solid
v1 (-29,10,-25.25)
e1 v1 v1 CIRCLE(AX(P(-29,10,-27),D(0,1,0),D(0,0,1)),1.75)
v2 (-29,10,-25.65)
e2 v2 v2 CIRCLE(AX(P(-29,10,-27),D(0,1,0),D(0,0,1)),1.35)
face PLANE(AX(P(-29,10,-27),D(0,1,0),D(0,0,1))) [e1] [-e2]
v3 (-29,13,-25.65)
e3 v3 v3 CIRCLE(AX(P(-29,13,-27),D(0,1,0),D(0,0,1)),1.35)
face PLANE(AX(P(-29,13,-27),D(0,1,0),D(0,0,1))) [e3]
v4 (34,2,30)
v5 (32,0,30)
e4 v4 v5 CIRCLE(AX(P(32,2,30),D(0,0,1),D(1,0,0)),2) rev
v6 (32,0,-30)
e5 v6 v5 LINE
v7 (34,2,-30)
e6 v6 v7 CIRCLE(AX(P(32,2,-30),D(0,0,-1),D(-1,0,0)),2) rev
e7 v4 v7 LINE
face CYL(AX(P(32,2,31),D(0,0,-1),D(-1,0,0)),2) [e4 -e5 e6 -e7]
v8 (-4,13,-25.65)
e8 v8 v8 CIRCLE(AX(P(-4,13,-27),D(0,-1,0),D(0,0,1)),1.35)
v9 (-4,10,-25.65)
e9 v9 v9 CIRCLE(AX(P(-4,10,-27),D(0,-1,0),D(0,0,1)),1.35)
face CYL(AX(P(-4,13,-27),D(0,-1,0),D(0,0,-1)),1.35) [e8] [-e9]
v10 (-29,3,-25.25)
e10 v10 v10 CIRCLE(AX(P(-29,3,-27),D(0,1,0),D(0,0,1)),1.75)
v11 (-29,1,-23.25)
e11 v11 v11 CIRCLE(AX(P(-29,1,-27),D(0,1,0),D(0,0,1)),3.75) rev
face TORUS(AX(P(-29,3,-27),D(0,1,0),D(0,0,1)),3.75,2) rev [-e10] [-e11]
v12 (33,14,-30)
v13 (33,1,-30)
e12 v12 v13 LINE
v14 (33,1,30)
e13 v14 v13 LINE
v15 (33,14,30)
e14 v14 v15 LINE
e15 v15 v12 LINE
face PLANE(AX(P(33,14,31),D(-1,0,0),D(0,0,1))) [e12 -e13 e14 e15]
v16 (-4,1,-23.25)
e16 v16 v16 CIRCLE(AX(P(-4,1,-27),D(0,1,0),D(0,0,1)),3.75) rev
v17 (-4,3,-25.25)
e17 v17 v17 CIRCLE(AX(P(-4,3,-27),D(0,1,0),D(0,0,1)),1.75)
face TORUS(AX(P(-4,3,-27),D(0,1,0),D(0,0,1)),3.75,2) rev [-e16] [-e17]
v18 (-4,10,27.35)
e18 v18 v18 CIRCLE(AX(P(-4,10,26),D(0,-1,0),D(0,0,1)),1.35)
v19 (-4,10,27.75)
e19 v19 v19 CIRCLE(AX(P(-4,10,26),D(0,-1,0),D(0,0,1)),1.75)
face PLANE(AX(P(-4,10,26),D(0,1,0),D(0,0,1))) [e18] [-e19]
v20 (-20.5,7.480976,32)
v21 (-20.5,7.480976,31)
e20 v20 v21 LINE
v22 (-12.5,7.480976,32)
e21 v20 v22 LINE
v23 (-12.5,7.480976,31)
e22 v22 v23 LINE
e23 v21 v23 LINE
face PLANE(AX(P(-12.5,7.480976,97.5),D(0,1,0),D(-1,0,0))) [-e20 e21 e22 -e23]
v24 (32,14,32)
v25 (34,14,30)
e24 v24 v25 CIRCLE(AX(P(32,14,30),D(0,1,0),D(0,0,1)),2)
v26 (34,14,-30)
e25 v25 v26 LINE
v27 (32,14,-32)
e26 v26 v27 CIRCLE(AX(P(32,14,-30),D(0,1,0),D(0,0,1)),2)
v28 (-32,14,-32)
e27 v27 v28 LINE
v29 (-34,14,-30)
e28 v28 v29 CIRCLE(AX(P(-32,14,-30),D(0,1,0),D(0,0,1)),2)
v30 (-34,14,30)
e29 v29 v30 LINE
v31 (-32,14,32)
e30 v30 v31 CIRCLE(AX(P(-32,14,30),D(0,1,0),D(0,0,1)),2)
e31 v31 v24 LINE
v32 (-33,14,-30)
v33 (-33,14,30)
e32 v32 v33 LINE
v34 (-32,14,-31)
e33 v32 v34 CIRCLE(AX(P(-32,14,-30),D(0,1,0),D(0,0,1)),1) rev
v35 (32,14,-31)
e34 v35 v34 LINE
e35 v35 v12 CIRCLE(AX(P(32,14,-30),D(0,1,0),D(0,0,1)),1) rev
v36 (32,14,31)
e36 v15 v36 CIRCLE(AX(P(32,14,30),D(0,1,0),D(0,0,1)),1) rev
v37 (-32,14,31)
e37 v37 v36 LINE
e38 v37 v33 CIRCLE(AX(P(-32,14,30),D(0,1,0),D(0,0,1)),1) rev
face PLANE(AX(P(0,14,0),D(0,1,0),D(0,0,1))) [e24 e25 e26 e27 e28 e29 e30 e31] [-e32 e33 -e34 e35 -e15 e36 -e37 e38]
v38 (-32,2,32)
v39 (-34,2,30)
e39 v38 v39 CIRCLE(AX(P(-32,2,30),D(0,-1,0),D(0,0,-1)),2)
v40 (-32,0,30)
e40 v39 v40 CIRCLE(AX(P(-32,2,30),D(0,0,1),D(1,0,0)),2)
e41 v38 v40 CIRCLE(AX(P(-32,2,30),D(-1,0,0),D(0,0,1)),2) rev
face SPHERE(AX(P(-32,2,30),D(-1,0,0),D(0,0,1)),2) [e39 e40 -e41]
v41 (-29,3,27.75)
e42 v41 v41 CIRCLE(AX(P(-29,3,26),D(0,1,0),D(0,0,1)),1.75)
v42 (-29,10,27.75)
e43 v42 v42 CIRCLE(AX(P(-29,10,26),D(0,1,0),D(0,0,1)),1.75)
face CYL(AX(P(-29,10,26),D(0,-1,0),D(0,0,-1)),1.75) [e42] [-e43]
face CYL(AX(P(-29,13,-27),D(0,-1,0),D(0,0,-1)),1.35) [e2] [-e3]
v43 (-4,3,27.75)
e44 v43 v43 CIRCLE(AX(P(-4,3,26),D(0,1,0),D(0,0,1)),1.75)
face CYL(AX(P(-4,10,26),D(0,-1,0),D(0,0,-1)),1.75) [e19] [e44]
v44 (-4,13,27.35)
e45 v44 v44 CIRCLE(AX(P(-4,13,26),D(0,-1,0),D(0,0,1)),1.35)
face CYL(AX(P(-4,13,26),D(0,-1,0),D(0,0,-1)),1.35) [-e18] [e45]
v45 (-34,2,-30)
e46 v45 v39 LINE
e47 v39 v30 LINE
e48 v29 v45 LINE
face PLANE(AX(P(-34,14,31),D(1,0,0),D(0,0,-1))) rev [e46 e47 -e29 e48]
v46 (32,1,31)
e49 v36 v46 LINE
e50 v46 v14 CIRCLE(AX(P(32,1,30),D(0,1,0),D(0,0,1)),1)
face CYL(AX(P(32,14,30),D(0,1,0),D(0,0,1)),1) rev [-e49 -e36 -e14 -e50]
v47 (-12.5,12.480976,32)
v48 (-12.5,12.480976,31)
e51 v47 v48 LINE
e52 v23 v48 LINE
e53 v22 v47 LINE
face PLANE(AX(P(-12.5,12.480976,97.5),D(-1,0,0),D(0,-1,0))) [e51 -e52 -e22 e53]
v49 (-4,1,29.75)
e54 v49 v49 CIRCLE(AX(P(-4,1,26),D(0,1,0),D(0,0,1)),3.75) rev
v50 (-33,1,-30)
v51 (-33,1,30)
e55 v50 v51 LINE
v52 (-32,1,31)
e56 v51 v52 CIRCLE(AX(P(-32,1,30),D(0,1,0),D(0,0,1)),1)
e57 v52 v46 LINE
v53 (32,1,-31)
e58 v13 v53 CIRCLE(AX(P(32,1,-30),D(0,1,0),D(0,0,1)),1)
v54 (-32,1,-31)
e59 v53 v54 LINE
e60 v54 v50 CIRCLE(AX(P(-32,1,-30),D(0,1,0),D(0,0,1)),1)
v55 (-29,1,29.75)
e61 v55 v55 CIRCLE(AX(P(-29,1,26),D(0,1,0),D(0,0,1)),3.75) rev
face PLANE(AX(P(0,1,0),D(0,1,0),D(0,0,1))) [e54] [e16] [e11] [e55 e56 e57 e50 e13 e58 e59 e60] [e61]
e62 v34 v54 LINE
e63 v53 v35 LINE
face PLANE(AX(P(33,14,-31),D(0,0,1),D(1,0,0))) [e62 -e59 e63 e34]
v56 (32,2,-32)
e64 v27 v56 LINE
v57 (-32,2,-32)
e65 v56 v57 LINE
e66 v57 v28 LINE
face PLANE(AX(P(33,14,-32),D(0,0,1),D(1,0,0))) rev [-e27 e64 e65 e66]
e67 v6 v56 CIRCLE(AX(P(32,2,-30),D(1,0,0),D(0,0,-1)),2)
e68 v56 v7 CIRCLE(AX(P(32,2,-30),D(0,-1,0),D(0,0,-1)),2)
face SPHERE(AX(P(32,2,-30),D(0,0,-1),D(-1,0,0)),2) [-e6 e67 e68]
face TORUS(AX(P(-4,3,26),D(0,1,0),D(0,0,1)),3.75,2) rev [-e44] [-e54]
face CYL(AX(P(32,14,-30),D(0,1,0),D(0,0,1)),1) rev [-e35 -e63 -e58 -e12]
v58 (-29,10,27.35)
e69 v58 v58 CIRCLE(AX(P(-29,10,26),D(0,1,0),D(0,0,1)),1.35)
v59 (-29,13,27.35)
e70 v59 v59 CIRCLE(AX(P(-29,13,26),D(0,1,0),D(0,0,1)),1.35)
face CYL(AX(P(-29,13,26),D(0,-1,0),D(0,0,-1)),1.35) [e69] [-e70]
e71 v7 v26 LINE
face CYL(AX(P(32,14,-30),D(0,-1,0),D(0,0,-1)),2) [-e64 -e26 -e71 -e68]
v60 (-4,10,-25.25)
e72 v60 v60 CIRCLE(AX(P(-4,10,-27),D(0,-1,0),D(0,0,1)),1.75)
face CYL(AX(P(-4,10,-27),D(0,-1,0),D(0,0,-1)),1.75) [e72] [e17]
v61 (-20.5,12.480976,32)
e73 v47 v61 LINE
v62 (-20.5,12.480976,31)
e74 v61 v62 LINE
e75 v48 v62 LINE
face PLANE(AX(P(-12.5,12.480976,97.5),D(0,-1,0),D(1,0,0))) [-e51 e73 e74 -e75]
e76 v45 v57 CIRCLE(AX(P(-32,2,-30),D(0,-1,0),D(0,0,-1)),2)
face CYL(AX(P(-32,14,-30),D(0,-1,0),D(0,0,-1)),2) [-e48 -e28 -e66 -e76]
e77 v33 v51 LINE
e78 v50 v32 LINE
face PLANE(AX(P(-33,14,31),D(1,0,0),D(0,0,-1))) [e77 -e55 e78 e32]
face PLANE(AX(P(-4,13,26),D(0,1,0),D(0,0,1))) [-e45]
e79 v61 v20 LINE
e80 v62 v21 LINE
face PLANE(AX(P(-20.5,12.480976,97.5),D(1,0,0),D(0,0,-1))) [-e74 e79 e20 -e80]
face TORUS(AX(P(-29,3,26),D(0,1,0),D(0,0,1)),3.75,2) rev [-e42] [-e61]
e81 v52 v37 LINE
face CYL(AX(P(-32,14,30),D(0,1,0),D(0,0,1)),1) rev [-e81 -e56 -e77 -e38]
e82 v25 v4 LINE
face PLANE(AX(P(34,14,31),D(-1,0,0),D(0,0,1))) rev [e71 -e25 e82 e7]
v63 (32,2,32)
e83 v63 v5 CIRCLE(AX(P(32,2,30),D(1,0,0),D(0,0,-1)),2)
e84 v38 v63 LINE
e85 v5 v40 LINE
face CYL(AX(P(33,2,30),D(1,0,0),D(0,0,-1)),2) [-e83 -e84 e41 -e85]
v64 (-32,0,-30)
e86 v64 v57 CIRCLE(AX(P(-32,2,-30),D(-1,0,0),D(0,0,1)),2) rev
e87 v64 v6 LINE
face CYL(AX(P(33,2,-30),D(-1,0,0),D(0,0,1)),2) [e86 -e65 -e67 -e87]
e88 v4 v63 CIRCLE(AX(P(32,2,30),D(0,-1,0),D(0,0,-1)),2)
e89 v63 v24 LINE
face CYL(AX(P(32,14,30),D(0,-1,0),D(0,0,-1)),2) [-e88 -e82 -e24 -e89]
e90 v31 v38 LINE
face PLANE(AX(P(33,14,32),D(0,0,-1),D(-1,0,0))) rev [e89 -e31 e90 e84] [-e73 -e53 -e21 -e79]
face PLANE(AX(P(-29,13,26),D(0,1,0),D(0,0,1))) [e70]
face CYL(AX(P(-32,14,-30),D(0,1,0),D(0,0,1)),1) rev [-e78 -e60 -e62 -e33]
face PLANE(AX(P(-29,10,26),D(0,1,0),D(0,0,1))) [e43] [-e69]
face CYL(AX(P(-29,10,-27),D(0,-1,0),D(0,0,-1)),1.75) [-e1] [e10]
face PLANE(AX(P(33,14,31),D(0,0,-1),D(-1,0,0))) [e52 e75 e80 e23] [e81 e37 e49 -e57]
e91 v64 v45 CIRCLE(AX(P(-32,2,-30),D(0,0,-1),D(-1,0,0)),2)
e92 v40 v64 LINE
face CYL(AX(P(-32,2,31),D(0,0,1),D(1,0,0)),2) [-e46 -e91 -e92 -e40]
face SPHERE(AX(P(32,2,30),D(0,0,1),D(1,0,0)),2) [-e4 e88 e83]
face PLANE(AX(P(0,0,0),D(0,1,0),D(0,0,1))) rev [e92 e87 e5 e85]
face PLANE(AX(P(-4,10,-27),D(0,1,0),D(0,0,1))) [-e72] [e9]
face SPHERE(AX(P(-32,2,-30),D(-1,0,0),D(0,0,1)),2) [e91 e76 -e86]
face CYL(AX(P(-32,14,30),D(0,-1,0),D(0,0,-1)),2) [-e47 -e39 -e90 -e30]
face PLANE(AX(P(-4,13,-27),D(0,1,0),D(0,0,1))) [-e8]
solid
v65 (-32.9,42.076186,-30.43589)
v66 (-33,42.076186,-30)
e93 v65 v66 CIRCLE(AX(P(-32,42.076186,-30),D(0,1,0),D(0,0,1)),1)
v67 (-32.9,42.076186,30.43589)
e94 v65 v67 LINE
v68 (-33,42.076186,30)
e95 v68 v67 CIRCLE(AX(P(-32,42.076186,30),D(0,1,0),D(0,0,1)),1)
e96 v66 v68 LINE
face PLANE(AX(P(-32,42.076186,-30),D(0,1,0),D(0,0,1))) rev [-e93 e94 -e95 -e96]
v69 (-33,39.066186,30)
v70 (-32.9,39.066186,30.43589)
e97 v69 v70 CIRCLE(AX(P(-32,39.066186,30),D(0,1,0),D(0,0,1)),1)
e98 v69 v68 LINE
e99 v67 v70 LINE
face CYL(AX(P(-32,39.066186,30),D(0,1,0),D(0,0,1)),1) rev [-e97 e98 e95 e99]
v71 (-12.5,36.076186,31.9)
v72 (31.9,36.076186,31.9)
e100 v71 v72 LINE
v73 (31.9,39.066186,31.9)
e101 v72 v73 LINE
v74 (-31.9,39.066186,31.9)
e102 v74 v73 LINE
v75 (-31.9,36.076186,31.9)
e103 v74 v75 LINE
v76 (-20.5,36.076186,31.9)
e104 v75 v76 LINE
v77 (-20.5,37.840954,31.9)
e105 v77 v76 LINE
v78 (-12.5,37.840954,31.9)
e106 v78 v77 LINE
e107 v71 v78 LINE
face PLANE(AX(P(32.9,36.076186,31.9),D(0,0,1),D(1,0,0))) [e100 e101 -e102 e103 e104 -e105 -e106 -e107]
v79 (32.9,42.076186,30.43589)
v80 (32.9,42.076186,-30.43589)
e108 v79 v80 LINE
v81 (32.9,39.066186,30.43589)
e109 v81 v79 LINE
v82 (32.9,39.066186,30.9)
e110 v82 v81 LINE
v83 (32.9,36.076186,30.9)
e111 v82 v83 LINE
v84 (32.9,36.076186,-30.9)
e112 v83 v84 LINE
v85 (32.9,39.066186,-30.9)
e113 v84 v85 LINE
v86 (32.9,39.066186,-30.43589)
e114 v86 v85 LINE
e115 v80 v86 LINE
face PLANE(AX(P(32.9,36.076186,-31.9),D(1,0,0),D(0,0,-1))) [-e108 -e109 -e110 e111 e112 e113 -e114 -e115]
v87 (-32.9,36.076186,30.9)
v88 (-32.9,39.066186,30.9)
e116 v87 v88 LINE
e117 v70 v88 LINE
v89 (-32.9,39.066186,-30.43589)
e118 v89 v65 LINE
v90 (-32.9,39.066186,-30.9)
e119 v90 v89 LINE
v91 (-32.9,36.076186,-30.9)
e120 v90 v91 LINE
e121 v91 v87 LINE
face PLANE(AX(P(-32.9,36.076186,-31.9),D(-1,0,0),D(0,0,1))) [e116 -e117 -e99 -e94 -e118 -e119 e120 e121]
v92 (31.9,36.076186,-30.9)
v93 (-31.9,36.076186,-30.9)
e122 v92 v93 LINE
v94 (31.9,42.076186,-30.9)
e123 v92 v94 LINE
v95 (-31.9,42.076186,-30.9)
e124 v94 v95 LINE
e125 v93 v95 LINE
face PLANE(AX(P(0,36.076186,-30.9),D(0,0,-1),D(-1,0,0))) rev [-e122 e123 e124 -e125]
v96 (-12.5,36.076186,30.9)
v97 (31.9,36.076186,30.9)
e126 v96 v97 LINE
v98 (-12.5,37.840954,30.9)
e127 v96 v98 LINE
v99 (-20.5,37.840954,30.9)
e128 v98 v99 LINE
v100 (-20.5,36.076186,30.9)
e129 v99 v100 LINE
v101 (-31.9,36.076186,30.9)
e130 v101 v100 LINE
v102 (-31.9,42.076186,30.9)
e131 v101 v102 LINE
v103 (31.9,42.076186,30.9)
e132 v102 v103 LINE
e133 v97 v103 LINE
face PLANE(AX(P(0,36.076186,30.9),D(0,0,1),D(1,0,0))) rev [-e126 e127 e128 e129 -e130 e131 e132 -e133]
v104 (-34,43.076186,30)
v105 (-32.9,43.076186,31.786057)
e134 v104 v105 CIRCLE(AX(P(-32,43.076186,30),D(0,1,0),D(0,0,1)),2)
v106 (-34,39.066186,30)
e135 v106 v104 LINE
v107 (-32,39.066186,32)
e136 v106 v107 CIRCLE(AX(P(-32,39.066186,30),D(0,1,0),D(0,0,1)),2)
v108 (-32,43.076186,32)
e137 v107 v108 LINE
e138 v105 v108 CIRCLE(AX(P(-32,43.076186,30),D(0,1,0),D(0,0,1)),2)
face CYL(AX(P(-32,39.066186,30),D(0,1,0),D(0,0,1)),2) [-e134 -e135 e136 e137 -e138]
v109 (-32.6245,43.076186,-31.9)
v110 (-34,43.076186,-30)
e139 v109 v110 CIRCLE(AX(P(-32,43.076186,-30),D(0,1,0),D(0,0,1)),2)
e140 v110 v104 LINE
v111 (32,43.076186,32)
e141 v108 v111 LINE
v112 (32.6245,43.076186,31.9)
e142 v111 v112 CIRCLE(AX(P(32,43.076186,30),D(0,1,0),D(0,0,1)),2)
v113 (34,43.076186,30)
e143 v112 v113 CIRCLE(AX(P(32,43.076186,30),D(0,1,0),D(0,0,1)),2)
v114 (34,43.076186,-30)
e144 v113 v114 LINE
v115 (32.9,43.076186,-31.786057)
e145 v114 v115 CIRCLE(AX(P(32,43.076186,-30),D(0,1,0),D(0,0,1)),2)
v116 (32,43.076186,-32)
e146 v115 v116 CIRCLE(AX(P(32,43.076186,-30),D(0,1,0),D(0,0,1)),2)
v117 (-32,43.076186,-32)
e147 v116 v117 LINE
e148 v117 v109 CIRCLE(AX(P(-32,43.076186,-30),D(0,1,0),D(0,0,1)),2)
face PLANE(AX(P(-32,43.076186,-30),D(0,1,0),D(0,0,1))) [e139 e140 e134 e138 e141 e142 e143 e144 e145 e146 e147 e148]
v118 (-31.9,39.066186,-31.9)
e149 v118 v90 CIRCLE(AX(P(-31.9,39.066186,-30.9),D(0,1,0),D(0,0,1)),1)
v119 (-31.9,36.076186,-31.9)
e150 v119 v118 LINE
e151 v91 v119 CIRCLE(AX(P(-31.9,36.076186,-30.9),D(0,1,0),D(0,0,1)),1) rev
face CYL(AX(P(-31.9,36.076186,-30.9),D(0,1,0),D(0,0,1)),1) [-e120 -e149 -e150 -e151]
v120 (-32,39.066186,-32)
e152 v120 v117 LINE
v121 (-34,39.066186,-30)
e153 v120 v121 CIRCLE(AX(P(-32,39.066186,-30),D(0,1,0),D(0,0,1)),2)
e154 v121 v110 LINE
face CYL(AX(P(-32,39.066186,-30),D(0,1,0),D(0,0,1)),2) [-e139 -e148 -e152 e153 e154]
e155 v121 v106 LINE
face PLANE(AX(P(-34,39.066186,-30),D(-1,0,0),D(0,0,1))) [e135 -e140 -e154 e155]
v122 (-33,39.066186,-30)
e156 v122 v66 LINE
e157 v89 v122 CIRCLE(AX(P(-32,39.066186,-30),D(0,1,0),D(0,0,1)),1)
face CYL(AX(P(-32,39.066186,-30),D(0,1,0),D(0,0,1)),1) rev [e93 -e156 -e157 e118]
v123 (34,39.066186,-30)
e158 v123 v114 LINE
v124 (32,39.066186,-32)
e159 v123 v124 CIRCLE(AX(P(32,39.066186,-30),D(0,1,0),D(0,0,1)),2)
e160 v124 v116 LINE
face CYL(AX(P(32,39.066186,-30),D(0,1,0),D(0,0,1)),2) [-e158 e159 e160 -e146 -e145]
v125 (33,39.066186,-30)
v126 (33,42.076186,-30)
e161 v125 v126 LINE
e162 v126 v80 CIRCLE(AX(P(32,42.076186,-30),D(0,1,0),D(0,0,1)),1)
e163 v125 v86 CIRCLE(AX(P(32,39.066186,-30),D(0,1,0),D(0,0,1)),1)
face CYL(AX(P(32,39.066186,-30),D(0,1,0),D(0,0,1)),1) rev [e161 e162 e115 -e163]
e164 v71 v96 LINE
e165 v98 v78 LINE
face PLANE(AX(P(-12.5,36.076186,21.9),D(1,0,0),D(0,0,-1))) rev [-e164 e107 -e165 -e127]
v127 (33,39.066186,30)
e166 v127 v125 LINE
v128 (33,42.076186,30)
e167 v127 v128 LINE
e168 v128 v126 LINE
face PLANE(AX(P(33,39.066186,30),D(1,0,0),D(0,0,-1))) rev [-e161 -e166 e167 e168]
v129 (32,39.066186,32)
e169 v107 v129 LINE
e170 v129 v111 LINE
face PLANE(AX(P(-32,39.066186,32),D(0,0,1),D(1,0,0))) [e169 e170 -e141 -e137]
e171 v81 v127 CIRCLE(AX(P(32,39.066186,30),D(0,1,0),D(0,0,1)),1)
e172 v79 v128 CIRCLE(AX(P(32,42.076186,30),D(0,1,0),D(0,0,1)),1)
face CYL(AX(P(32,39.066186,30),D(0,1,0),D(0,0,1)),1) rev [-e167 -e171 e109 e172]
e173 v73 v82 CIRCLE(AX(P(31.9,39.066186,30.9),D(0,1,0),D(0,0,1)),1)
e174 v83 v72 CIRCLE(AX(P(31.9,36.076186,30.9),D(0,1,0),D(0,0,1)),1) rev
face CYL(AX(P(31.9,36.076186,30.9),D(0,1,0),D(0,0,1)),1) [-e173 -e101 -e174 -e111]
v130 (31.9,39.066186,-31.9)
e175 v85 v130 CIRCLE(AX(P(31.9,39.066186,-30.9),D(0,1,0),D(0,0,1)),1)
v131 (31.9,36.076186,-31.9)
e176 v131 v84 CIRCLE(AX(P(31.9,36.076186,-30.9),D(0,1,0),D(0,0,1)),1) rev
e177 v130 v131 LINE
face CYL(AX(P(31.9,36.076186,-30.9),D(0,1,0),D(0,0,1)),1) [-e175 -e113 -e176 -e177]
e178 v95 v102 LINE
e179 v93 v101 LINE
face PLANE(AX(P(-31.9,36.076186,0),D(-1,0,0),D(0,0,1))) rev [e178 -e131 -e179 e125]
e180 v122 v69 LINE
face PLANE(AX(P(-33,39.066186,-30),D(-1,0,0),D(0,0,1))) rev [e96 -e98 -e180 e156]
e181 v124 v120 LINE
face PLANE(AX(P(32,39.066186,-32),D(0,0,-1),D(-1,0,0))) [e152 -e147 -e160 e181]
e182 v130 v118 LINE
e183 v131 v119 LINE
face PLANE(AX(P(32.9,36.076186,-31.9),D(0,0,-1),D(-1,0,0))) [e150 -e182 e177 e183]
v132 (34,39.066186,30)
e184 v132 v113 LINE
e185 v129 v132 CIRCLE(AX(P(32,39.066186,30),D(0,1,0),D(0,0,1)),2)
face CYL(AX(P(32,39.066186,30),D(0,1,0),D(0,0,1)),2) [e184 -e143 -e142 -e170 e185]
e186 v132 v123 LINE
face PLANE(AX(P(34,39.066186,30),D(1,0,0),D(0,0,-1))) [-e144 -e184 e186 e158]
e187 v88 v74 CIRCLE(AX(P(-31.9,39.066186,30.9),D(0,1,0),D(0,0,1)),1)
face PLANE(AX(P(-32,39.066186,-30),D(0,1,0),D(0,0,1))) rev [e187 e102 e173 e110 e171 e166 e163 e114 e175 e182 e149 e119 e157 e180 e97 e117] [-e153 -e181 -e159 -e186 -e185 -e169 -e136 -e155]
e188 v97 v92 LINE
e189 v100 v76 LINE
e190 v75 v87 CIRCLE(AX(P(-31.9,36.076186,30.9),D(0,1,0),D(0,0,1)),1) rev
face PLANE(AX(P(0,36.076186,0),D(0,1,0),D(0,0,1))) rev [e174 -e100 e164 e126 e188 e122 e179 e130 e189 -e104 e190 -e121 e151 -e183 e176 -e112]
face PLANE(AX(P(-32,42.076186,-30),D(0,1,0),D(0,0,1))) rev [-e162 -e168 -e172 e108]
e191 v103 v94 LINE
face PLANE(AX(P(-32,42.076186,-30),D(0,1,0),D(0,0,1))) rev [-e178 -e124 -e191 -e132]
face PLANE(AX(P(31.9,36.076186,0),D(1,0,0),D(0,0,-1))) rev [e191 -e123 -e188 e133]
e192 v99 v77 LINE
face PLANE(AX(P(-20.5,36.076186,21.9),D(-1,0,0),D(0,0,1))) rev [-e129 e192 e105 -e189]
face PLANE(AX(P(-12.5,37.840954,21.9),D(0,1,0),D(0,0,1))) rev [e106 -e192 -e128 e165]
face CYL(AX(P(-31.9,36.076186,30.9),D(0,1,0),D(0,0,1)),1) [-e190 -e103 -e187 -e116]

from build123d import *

# Parameters (mm, degrees)
SKETCH1_W                = 68
SKETCH1_H                = 64
SKETCH1_W_2              = 66
SKETCH1_H_2              = 62
EXTRUDE_THIN1_DEPTH      = 14
SKETCH1_2_W              = 66
SKETCH1_2_H              = 62
BOSS_EXTRUDE1_DEPTH      = 1
SKETCH3_R                = 1.75
BOSS_EXTRUDE2_DEPTH      = 9
SKETCH5_R                = 1.75
BOSS_EXTRUDE3_DEPTH      = 9
SKETCH7_R                = 1.35
BOSS_EXTRUDE4_DEPTH      = 3
SKETCH8_R                = 1.35
BOSS_EXTRUDE5_DEPTH      = 3
FILLET2_R                = 2
FILLET3_R                = 2
FILLET4_R                = 2
FILLET3_OF_MIRROR1_R     = 2
FILLET4_OF_MIRROR1_R     = 2
CUT_EXTRUDE1_START       = 2
SKETCH14_W               = 8
SKETCH14_H               = 5
CUT_EXTRUDE1_DEPTH       = 126.5
FILLET7_R                = 1
BOSS_EXTRUDE9_DEPTH      = 4
BOSS_EXTRUDE9_DEPTH_BACK = 0.01
BOSS_EXTRUDE9_START      = 20
SHELL1_T                 = -1
SKETCH25_W               = 65.8
SKETCH25_H               = 63.8
SKETCH25_W_2             = 63.8
SKETCH25_H_2             = 61.8
EXTRUDE_THIN5_DEPTH      = 7
FILLET8_R                = 1
SKETCH26_W               = 8
SKETCH26_H               = 1.764767718
CUT_EXTRUDE2_DEPTH       = 10


with BuildPart() as part:
    # Sketch1 → Extrude-Thin1 (new body)
    with BuildSketch(Plane(origin=(0, 0, 0), x_dir=(1, 0, 0), z_dir=(0, 1, 0))):
        Rectangle(SKETCH1_W, SKETCH1_H)
        Rectangle(SKETCH1_W_2, SKETCH1_H_2, mode=Mode.SUBTRACT)
    extrude(amount=EXTRUDE_THIN1_DEPTH)

    # Sketch1<2> → Boss-Extrude1 (add)
    with BuildSketch(Plane(origin=(0, 0, 0), x_dir=(1, 0, 0), z_dir=(0, 1, 0))):
        Rectangle(SKETCH1_2_W, SKETCH1_2_H)
    extrude(amount=BOSS_EXTRUDE1_DEPTH)

    # Sketch3 → Boss-Extrude2 (add)
    with BuildSketch(Plane(origin=(0, 1, 0), x_dir=(1, 0, 0), z_dir=(0, 1, 0))):
        with Locations(Location((-29, 27, 0), (0, 0, 270))):
            Circle(SKETCH3_R)
    boss_extrude2 = extrude(amount=BOSS_EXTRUDE2_DEPTH)

    # Sketch5 → Boss-Extrude3 (add)
    with BuildSketch(Plane(origin=(0, 1, 0), x_dir=(1, 0, 0), z_dir=(0, 1, 0))):
        with Locations(Location((-29, -26, 0), (0, 0, 270))):
            Circle(SKETCH5_R)
    boss_extrude3 = extrude(amount=BOSS_EXTRUDE3_DEPTH)

    # Sketch7 → Boss-Extrude4 (add)
    with BuildSketch(Plane(origin=(0, 10, 0), x_dir=(1, 0, 0), z_dir=(0, 1, 0))):
        with Locations(Location((-29, 27, 0), (0, 0, 270))):
            Circle(SKETCH7_R)
    boss_extrude4 = extrude(amount=BOSS_EXTRUDE4_DEPTH)

    # Sketch8 → Boss-Extrude5 (add)
    with BuildSketch(Plane(origin=(0, 10, 0), x_dir=(1, 0, 0), z_dir=(0, 1, 0))):
        with Locations(Location((-29, -26, 0), (0, 0, 270))):
            Circle(SKETCH8_R)
    boss_extrude5 = extrude(amount=BOSS_EXTRUDE5_DEPTH)

    # Fillet2
    fillet2_edges = [part.edges().sort_by_distance(p)[0] for p in [
        (0, 0, -32),
        (34, 0, 0),
        (0, 0, 32),
        (-34, 0, 0),
        (-34, 7, -32),
        (34, 7, -32),
        (34, 7, 32),
        (-34, 7, 32),
    ]]
    fillet(fillet2_edges, radius=FILLET2_R)

    # Fillet3
    fillet3_edges = [part.edges().sort_by_distance(p)[0] for p in [
        (-29, 1, -28.75),
    ]]
    fillet(fillet3_edges, radius=FILLET3_R)

    # Fillet4
    fillet4_edges = [part.edges().sort_by_distance(p)[0] for p in [
        (-29, 1, 24.25),
    ]]
    fillet(fillet4_edges, radius=FILLET4_R)

    # Mirror1: Boss-Extrude2, Boss-Extrude3, Boss-Extrude4, Boss-Extrude5 across plane
    add(boss_extrude2.mirror(Plane(origin=(-16.5, 0, 0), x_dir=(0, 0, 1), z_dir=(1, 0, 0))))
    add(boss_extrude3.mirror(Plane(origin=(-16.5, 0, 0), x_dir=(0, 0, 1), z_dir=(1, 0, 0))))
    add(boss_extrude4.mirror(Plane(origin=(-16.5, 0, 0), x_dir=(0, 0, 1), z_dir=(1, 0, 0))))
    add(boss_extrude5.mirror(Plane(origin=(-16.5, 0, 0), x_dir=(0, 0, 1), z_dir=(1, 0, 0))))

    # Fillet3 of Mirror1
    fillet3_of_mirror1_edges = [part.edges().sort_by_distance(p)[0] for p in [
        (-4, 1, -28.75),
    ]]
    fillet(fillet3_of_mirror1_edges, radius=FILLET3_OF_MIRROR1_R)

    # Fillet4 of Mirror1
    fillet4_of_mirror1_edges = [part.edges().sort_by_distance(p)[0] for p in [
        (-4, 1, 24.25),
    ]]
    fillet(fillet4_of_mirror1_edges, radius=FILLET4_OF_MIRROR1_R)

    # Sketch14 → Cut-Extrude1 (cut)
    with BuildSketch(Plane.XY.offset(-31).offset(CUT_EXTRUDE1_START)):
        with Locations((-16.5, 9.980975897)):
            Rectangle(SKETCH14_W, SKETCH14_H)
    extrude(amount=CUT_EXTRUDE1_DEPTH, mode=Mode.SUBTRACT)

    # Fillet7
    fillet7_edges = [part.edges().sort_by_distance(p)[0] for p in [
        (-33, 7.5, -31),
        (-33, 7.5, 31),
        (33, 7.5, 31),
        (33, 7.5, -31),
    ]]
    fillet(fillet7_edges, radius=FILLET7_R)


with BuildPart() as body_2:
    # Sketch22 → Boss-Extrude9 (new, two sides: drawn at the far end of the back side and taken through both)
    with BuildSketch(Plane(origin=(0, 1, 0), x_dir=(1, 0, 0), z_dir=(0, 1, 0)).offset(BOSS_EXTRUDE9_START - BOSS_EXTRUDE9_DEPTH_BACK)):
        with BuildLine():
            Line((-34, 30), (-34, -30))
            ThreePointArc((-34, -30), (-33.414213562, -31.414213562), (-32, -32))
            Line((-32, -32), (32, -32))
            ThreePointArc((32, -32), (33.414213562, -31.414213562), (34, -30))
            Line((34, -30), (34, 30))
            ThreePointArc((34, 30), (33.414213562, 31.414213562), (32, 32))
            Line((32, 32), (-32, 32))
            ThreePointArc((-32, 32), (-33.414213562, 31.414213562), (-34, 30))
        make_face()
    extrude(amount=BOSS_EXTRUDE9_DEPTH + BOSS_EXTRUDE9_DEPTH_BACK)

    # Shell1
    shell1_openings = [body_2.faces().sort_by_distance(p)[0] for p in [
        (0, 20.99, 0),
    ]]
    offset(amount=SHELL1_T, openings=shell1_openings, kind=Kind.INTERSECTION)

    # Sketch25 → Extrude-Thin5 (add)
    with BuildSketch(Plane(origin=(0, 25, 0), x_dir=(1, 0, 0), z_dir=(0, 1, 0))):
        Rectangle(SKETCH25_W, SKETCH25_H)
        Rectangle(SKETCH25_W_2, SKETCH25_H_2, mode=Mode.SUBTRACT)
    extrude(amount=-EXTRUDE_THIN5_DEPTH)

    # Fillet8
    # the kernel refuses this fillet: 1 mm, written as the material it takes off along each edge
    with BuildSketch(Plane(origin=(32.9, 27.5, 31.9), x_dir=(0, 0, -1), z_dir=(0, -1, 0))) as fillet8_piece_1_section:
        with BuildLine():
            CenterArc((FILLET8_R, -FILLET8_R), FILLET8_R, 90, 90)
            Line((0, -FILLET8_R), (0, 0))
            Line((0, 0), (FILLET8_R, 0))
        make_face()
    fillet8_piece_1 = extrude(amount=12, mode=Mode.PRIVATE)
    fillet8_piece_1 = fillet8_piece_1 & Plane(origin=(32, 18.245, 30), x_dir=(0, 0, 1), z_dir=(0, -1, 0)) * Cylinder(2, 29, mode=Mode.PRIVATE)
    fillet8_piece_1 = split(fillet8_piece_1, bisect_by=Plane(origin=(32.660150073, 20.99, 31.653243264), z_dir=(0, -1, 0)), keep=Keep.TOP, mode=Mode.PRIVATE)
    add(fillet8_piece_1, mode=Mode.SUBTRACT)
    with BuildSketch(Plane(origin=(32.9, 27.5, 31.9), x_dir=(0, 0, -1), z_dir=(0, -1, 0))) as fillet8_piece_2_section:
        with BuildLine():
            CenterArc((FILLET8_R, -FILLET8_R), FILLET8_R, 90, 90)
            Line((0, -FILLET8_R), (0, 0))
            Line((0, 0), (FILLET8_R, 0))
        make_face()
    fillet8_piece_2 = extrude(amount=12, mode=Mode.PRIVATE)
    fillet8_piece_2 = fillet8_piece_2 - Plane(origin=(32, 24.245, 30), x_dir=(0, 0, 1), z_dir=(0, -1, 0)) * Cylinder(2, 29, mode=Mode.PRIVATE)
    fillet8_piece_2 = split(fillet8_piece_2, bisect_by=Plane(origin=(32.806073039, 20.99, 31.874073412), z_dir=(0, 1, 0)), keep=Keep.TOP, mode=Mode.PRIVATE)
    add(fillet8_piece_2, mode=Mode.SUBTRACT)
    with BuildSketch(Plane(origin=(32.9, 27.5, 31.9), x_dir=(0, 0, -1), z_dir=(0, -1, 0))) as fillet8_piece_3_section:
        with BuildLine():
            CenterArc((FILLET8_R, -FILLET8_R), FILLET8_R, 90, 90)
            Line((0, -FILLET8_R), (0, 0))
            Line((0, 0), (FILLET8_R, 0))
        make_face()
    fillet8_piece_3 = extrude(amount=12, mode=Mode.PRIVATE)
    fillet8_piece_3 = fillet8_piece_3 - Plane(origin=(32, 18.245, 30), x_dir=(0, 0, 1), z_dir=(0, -1, 0)) * Cylinder(2, 29, mode=Mode.PRIVATE)
    fillet8_piece_3 = split(fillet8_piece_3, bisect_by=Plane(origin=(32.806073039, 20.99, 31.874073412), z_dir=(0, -1, 0)), keep=Keep.TOP, mode=Mode.PRIVATE)
    add(fillet8_piece_3, mode=Mode.SUBTRACT)
    with BuildSketch(Plane(origin=(-32.9, 27.5, 31.9), x_dir=(1, 0, 0), z_dir=(0, -1, 0))) as fillet8_piece_4_section:
        with BuildLine():
            CenterArc((FILLET8_R, -FILLET8_R), FILLET8_R, 90, 90)
            Line((0, -FILLET8_R), (0, 0))
            Line((0, 0), (FILLET8_R, 0))
        make_face()
    fillet8_piece_4 = extrude(amount=12, mode=Mode.PRIVATE)
    fillet8_piece_4 = fillet8_piece_4 & Plane(origin=(-32, 18.245, 30), x_dir=(-1, 0, 0), z_dir=(0, -1, 0)) * Cylinder(2, 28, mode=Mode.PRIVATE)
    fillet8_piece_4 = split(fillet8_piece_4, bisect_by=Plane(origin=(-32.660150073, 20.99, 31.653243264), z_dir=(0, -1, 0)), keep=Keep.TOP, mode=Mode.PRIVATE)
    add(fillet8_piece_4, mode=Mode.SUBTRACT)
    with BuildSketch(Plane(origin=(-32.9, 27.5, 31.9), x_dir=(1, 0, 0), z_dir=(0, -1, 0))) as fillet8_piece_5_section:
        with BuildLine():
            CenterArc((FILLET8_R, -FILLET8_R), FILLET8_R, 90, 90)
            Line((0, -FILLET8_R), (0, 0))
            Line((0, 0), (FILLET8_R, 0))
        make_face()
    fillet8_piece_5 = extrude(amount=12, mode=Mode.PRIVATE)
    fillet8_piece_5 = fillet8_piece_5 - Plane(origin=(-32, 24.245, 30), x_dir=(-1, 0, 0), z_dir=(0, -1, 0)) * Cylinder(2, 28, mode=Mode.PRIVATE)
    fillet8_piece_5 = split(fillet8_piece_5, bisect_by=Plane(origin=(-32.806073039, 20.99, 31.874073412), z_dir=(0, 1, 0)), keep=Keep.TOP, mode=Mode.PRIVATE)
    add(fillet8_piece_5, mode=Mode.SUBTRACT)
    with BuildSketch(Plane(origin=(-32.9, 27.5, 31.9), x_dir=(1, 0, 0), z_dir=(0, -1, 0))) as fillet8_piece_6_section:
        with BuildLine():
            CenterArc((FILLET8_R, -FILLET8_R), FILLET8_R, 90, 90)
            Line((0, -FILLET8_R), (0, 0))
            Line((0, 0), (FILLET8_R, 0))
        make_face()
    fillet8_piece_6 = extrude(amount=12, mode=Mode.PRIVATE)
    fillet8_piece_6 = fillet8_piece_6 - Plane(origin=(-32, 18.245, 30), x_dir=(-1, 0, 0), z_dir=(0, -1, 0)) * Cylinder(2, 28, mode=Mode.PRIVATE)
    fillet8_piece_6 = split(fillet8_piece_6, bisect_by=Plane(origin=(-32.806073039, 20.99, 31.874073412), z_dir=(0, -1, 0)), keep=Keep.TOP, mode=Mode.PRIVATE)
    add(fillet8_piece_6, mode=Mode.SUBTRACT)
    with BuildSketch(Plane(origin=(-32.9, 27.5, -31.9), x_dir=(1, 0, 0), z_dir=(0, -1, 0))) as fillet8_piece_7_section:
        with BuildLine():
            CenterArc((FILLET8_R, FILLET8_R), FILLET8_R, 180, 90)
            Line((0, FILLET8_R), (0, 0))
            Line((0, 0), (FILLET8_R, 0))
        make_face()
    fillet8_piece_7 = extrude(amount=12, mode=Mode.PRIVATE)
    fillet8_piece_7 = split(fillet8_piece_7, bisect_by=Plane(origin=(-32.660150073, 20.99, -31.653243264), z_dir=(0, -1, 0)), keep=Keep.TOP, mode=Mode.PRIVATE)
    fillet8_piece_7 = fillet8_piece_7 & Plane(origin=(-32, 18.245, -30), x_dir=(0, 0, -1), z_dir=(0, -1, 0)) * Cylinder(2, 28, mode=Mode.PRIVATE)
    add(fillet8_piece_7, mode=Mode.SUBTRACT)
    with BuildSketch(Plane(origin=(-32.9, 27.5, -31.9), x_dir=(1, 0, 0), z_dir=(0, -1, 0))) as fillet8_piece_8_section:
        with BuildLine():
            CenterArc((FILLET8_R, FILLET8_R), FILLET8_R, 180, 90)
            Line((0, FILLET8_R), (0, 0))
            Line((0, 0), (FILLET8_R, 0))
        make_face()
    fillet8_piece_8 = extrude(amount=12, mode=Mode.PRIVATE)
    fillet8_piece_8 = split(fillet8_piece_8, bisect_by=Plane(origin=(-32.806073039, 20.99, -31.874073412), z_dir=(0, 1, 0)), keep=Keep.TOP, mode=Mode.PRIVATE)
    fillet8_piece_8 = fillet8_piece_8 - Plane(origin=(-32, 24.245, -30), x_dir=(0, 0, -1), z_dir=(0, -1, 0)) * Cylinder(2, 28, mode=Mode.PRIVATE)
    add(fillet8_piece_8, mode=Mode.SUBTRACT)
    with BuildSketch(Plane(origin=(-32.9, 27.5, -31.9), x_dir=(1, 0, 0), z_dir=(0, -1, 0))) as fillet8_piece_9_section:
        with BuildLine():
            CenterArc((FILLET8_R, FILLET8_R), FILLET8_R, 180, 90)
            Line((0, FILLET8_R), (0, 0))
            Line((0, 0), (FILLET8_R, 0))
        make_face()
    fillet8_piece_9 = extrude(amount=12, mode=Mode.PRIVATE)
    fillet8_piece_9 = split(fillet8_piece_9, bisect_by=Plane(origin=(-32.806073039, 20.99, -31.874073412), z_dir=(0, -1, 0)), keep=Keep.TOP, mode=Mode.PRIVATE)
    fillet8_piece_9 = fillet8_piece_9 - Plane(origin=(-32, 18.245, -30), x_dir=(0, 0, -1), z_dir=(0, -1, 0)) * Cylinder(2, 28, mode=Mode.PRIVATE)
    add(fillet8_piece_9, mode=Mode.SUBTRACT)
    with BuildSketch(Plane(origin=(32.9, 27.5, -31.9), x_dir=(0, 0, 1), z_dir=(0, -1, 0))) as fillet8_piece_10_section:
        with BuildLine():
            CenterArc((FILLET8_R, FILLET8_R), FILLET8_R, 180, 90)
            Line((0, FILLET8_R), (0, 0))
            Line((0, 0), (FILLET8_R, 0))
        make_face()
    fillet8_piece_10 = extrude(amount=12, mode=Mode.PRIVATE)
    fillet8_piece_10 = fillet8_piece_10 & Plane(origin=(32, 18.245, -30), x_dir=(1, 0, 0), z_dir=(0, -1, 0)) * Cylinder(2, 28, mode=Mode.PRIVATE)
    fillet8_piece_10 = split(fillet8_piece_10, bisect_by=Plane(origin=(32.660150073, 20.99, -31.653243264), z_dir=(0, -1, 0)), keep=Keep.TOP, mode=Mode.PRIVATE)
    add(fillet8_piece_10, mode=Mode.SUBTRACT)
    with BuildSketch(Plane(origin=(32.9, 27.5, -31.9), x_dir=(0, 0, 1), z_dir=(0, -1, 0))) as fillet8_piece_11_section:
        with BuildLine():
            CenterArc((FILLET8_R, FILLET8_R), FILLET8_R, 180, 90)
            Line((0, FILLET8_R), (0, 0))
            Line((0, 0), (FILLET8_R, 0))
        make_face()
    fillet8_piece_11 = extrude(amount=12, mode=Mode.PRIVATE)
    fillet8_piece_11 = fillet8_piece_11 - Plane(origin=(32, 24.245, -30), x_dir=(1, 0, 0), z_dir=(0, -1, 0)) * Cylinder(2, 28, mode=Mode.PRIVATE)
    fillet8_piece_11 = split(fillet8_piece_11, bisect_by=Plane(origin=(32.806073039, 20.99, -31.874073412), z_dir=(0, 1, 0)), keep=Keep.TOP, mode=Mode.PRIVATE)
    add(fillet8_piece_11, mode=Mode.SUBTRACT)
    with BuildSketch(Plane(origin=(32.9, 27.5, -31.9), x_dir=(0, 0, 1), z_dir=(0, -1, 0))) as fillet8_piece_12_section:
        with BuildLine():
            CenterArc((FILLET8_R, FILLET8_R), FILLET8_R, 180, 90)
            Line((0, FILLET8_R), (0, 0))
            Line((0, 0), (FILLET8_R, 0))
        make_face()
    fillet8_piece_12 = extrude(amount=12, mode=Mode.PRIVATE)
    fillet8_piece_12 = fillet8_piece_12 - Plane(origin=(32, 18.245, -30), x_dir=(1, 0, 0), z_dir=(0, -1, 0)) * Cylinder(2, 28, mode=Mode.PRIVATE)
    fillet8_piece_12 = split(fillet8_piece_12, bisect_by=Plane(origin=(32.806073039, 20.99, -31.874073412), z_dir=(0, -1, 0)), keep=Keep.TOP, mode=Mode.PRIVATE)
    add(fillet8_piece_12, mode=Mode.SUBTRACT)


with BuildPart() as body_2_1:
    # Body-Move/Copy7: moved
    add(body_2.part.moved(Location((0, 18.076186277, 0))))

    # Sketch26 → Cut-Extrude2 (cut)
    with BuildSketch(Plane.XY.offset(31.9)):
        with Locations((-16.5, 36.958570136)):
            Rectangle(SKETCH26_W, SKETCH26_H)
    extrude(amount=-CUT_EXTRUDE2_DEPTH, mode=Mode.SUBTRACT)


solid = Compound([part.part, body_2_1.part])
